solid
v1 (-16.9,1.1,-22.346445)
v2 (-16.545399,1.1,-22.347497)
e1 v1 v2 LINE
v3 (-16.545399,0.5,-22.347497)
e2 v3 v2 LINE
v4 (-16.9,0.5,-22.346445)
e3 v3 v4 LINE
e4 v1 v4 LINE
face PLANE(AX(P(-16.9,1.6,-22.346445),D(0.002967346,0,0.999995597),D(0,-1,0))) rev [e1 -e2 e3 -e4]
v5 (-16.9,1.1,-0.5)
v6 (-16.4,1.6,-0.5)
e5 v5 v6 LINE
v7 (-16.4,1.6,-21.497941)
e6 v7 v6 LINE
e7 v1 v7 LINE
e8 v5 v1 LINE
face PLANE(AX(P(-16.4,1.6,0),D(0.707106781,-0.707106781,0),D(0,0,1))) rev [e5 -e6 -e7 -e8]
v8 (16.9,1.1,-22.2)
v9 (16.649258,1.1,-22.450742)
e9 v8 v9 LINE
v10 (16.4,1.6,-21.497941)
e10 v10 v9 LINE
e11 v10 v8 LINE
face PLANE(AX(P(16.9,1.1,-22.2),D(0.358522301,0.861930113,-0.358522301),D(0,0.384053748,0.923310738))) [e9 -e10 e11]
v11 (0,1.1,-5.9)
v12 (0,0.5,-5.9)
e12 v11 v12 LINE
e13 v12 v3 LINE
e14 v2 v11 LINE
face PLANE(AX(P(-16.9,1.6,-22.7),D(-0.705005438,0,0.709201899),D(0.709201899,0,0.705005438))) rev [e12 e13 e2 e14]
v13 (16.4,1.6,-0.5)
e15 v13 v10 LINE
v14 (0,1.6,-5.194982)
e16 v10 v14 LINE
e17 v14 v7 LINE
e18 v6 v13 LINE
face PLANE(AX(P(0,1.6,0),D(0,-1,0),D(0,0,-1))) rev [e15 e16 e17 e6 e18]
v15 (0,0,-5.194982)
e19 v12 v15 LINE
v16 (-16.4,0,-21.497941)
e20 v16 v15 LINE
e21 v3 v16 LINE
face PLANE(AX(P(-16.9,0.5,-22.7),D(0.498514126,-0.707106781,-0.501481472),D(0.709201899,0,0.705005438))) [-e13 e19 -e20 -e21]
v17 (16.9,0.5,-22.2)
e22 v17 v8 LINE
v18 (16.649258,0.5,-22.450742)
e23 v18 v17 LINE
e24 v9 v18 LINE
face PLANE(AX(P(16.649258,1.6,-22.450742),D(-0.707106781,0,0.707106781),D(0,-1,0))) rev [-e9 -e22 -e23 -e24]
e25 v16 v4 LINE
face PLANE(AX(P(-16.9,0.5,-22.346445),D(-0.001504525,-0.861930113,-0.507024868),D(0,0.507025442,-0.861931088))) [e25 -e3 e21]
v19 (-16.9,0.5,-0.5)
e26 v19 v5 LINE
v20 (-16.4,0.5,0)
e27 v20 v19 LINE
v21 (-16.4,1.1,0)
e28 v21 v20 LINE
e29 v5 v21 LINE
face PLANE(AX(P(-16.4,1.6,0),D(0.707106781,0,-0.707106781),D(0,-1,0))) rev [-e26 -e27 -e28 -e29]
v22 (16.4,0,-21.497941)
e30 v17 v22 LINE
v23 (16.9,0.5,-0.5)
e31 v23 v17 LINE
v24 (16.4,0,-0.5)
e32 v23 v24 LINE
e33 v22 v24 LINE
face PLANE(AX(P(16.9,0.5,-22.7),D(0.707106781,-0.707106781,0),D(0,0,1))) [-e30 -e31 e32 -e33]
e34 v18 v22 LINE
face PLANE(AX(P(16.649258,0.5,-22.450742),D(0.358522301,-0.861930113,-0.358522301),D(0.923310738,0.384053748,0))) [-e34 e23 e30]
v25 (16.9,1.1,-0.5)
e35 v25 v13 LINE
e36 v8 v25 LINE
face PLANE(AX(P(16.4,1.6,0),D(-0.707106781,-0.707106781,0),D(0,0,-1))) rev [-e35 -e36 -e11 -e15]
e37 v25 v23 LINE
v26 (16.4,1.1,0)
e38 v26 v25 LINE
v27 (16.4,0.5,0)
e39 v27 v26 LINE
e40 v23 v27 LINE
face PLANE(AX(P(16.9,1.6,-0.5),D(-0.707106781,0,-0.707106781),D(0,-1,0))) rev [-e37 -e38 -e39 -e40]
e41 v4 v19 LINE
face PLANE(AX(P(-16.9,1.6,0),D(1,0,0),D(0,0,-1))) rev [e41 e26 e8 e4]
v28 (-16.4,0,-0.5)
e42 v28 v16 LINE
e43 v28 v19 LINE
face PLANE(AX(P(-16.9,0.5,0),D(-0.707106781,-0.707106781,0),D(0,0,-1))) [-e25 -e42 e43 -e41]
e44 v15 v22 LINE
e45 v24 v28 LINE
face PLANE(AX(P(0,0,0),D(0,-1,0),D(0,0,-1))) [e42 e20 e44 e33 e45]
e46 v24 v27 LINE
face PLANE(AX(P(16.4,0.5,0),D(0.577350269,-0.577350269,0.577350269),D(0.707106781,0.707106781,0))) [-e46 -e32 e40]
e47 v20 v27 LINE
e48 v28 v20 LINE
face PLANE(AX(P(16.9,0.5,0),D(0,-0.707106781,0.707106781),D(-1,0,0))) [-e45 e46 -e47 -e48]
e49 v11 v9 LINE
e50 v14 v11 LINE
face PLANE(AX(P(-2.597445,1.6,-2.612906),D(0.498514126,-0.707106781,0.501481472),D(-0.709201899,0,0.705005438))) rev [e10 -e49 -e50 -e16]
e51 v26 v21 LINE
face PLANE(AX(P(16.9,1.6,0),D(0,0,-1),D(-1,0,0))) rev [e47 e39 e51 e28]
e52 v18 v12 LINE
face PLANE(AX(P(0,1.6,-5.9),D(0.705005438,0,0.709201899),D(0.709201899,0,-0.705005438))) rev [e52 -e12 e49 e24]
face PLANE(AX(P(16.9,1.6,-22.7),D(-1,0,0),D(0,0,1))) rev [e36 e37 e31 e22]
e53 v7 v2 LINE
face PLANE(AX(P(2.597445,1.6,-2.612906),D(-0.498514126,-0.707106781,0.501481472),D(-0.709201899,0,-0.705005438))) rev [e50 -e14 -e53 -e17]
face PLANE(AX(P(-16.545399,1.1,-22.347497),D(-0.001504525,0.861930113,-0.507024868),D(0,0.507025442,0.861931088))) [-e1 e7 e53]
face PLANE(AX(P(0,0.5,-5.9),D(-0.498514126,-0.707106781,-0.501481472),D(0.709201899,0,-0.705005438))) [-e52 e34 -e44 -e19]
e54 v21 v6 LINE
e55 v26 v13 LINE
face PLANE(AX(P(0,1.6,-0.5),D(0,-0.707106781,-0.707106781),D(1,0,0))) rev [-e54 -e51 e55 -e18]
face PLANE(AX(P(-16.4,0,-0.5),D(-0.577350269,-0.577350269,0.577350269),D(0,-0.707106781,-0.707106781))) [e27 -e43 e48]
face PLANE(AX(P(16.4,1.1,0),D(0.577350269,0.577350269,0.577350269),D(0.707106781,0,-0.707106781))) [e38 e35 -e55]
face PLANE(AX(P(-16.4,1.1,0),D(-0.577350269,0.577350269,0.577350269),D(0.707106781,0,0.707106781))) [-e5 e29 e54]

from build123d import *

# Parameters (mm, degrees)
BOSS_EXTRUDE1_DEPTH = 1.6


with BuildPart() as part:
    # Sketch1 → Boss-Extrude1 (new body)
    with BuildSketch(Plane(origin=(0, 0, 0), x_dir=(1, 0, 0), z_dir=(0, 1, 0))):
        Polygon((16.9, 22.7), (16.9, 0), (-16.9, 0), (-16.9, 22.7), (0, 5.9), align=None)
    extrude(amount=BOSS_EXTRUDE1_DEPTH)

    # Chamfer1
    # the kernel refuses this chamfer: 0.5, 0.353554947 mm, written as the material it takes off along each edge
    with BuildSketch(Plane(origin=(-16.566666667, 1.266666667, -0.333333333), x_dir=(-0.7071067811865475, 0, -0.7071067811865475), z_dir=(-0.5773502691896256, 0.5773502691896261, 0.5773502691896256)), Plane(origin=(16.566666667, 1.266666667, -0.333333333), x_dir=(-0.7071067811865475, 0, 0.7071067811865475), z_dir=(0.5773502691896258, 0.5773502691896256, 0.5773502691896258))) as chamfer1_piece_1:
        Polygon((-0.353553391, 0.204124145), (0.353553391, 0.204124145), (0, -0.40824829), align=None)
    extrude(amount=0.635085296, mode=Mode.SUBTRACT)
    with BuildSketch(Plane(origin=(-16.615133017, 1.266666667, -22.06396102), x_dir=(0.9999955974192072, 0, -0.0029673459864134454), z_dir=(-0.0015045248311199464, 0.8619301129134874, -0.507024868086345))) as chamfer1_piece_2:
        Polygon((-0.284027501, 0.328713527), (0.070575009, 0.328713527), (0.213452492, -0.657427055), align=None)
    extrude(amount=0.671248828, mode=Mode.SUBTRACT)
    with BuildSketch(Plane(origin=(16.64975272, 1.266666667, -22.049560855), x_dir=(-0.7071067811865375, 0, -0.7071067811865576), z_dir=(0.35852230087747156, 0.8619301129134861, -0.3585223008774614))) as chamfer1_piece_3:
        Polygon((-0.070575009, -0.328713527), (0.284027501, -0.328713527), (-0.213452492, 0.657427055), align=None)
    extrude(amount=0.671248828, mode=Mode.SUBTRACT)
    with BuildSketch(Plane(origin=(16.64975272, 0.333333333, -22.049560855), x_dir=(-0.7071067811865375, 0, -0.7071067811865576), z_dir=(0.3585223008774716, -0.8619301129134861, -0.3585223008774613))) as chamfer1_piece_4:
        Polygon((-0.070575009, 0.328713527), (0.284027501, 0.328713527), (-0.213452492, -0.657427055), align=None)
    extrude(amount=0.671248828, mode=Mode.SUBTRACT)
    with BuildSketch(Plane(origin=(16.566666667, 0.333333333, -0.333333333), x_dir=(-0.7071067811865475, 0, 0.7071067811865475), z_dir=(0.5773502691896258, -0.5773502691896257, 0.5773502691896258)), Plane(origin=(-16.566666667, 0.333333333, -0.333333333), x_dir=(-0.7071067811865475, 0, -0.7071067811865475), z_dir=(-0.5773502691896256, -0.5773502691896261, 0.5773502691896255))) as chamfer1_piece_5:
        Polygon((-0.353553391, -0.204124145), (0.353553391, -0.204124145), (0, 0.40824829), align=None)
    extrude(amount=0.635085296, mode=Mode.SUBTRACT)
    with BuildSketch(Plane(origin=(-16.615133017, 0.333333333, -22.06396102), x_dir=(0.9999955974192072, 0, -0.0029673459864134454), z_dir=(-0.0015045248311200809, -0.8619301129134874, -0.507024868086345))) as chamfer1_piece_6:
        Polygon((-0.284027501, -0.328713527), (0.070575009, -0.328713527), (0.213452492, 0.657427055), align=None)
    extrude(amount=0.671248828, mode=Mode.SUBTRACT)
    with BuildSketch(Plane(origin=(-16.9, 1.6, 1.285841494), x_dir=(-0.02749587661058907, -0.9996219169112965, 0), z_dir=(0, 0, -1)), Plane(origin=(16.9, 1.6, -23.985841494), x_dir=(0.02749587661058907, -0.9996219169112965, 0), z_dir=(0, 0, 1))) as chamfer1_piece_7:
        with BuildLine():
            Line((0.514336598, 0), (-0.028273577, -0.513558897))
            Line((-0.028273577, -0.513558897), (-0.038269797, -0.513283938))
            ThreePointArc((-0.038269797, -0.513283938), (-0.017064614, -0.256698915), (-0.009996219, 0.000274959))
            Line((-0.009996219, 0.000274959), (0.000274959, 0.009996219))
            ThreePointArc((0.000274959, 0.009996219), (0.257248832, 0.002927825), (0.514611556, 0.009996219))
            Line((0.514611556, 0.009996219), (0.514336598, 0))
        make_face()
    extrude(amount=25.271682988, mode=Mode.SUBTRACT)
    with BuildSketch(Plane(origin=(18.185841494, 1.6, 0), x_dir=(0, -0.9996219169112968, 0.02749587661058636), z_dir=(-1, 0, 0))) as chamfer1_piece_8:
        with BuildLine():
            Line((0.514336598, 0), (-0.028273577, -0.513558897))
            Line((-0.028273577, -0.513558897), (-0.038269797, -0.513283938))
            ThreePointArc((-0.038269797, -0.513283938), (-0.017064614, -0.256698915), (-0.009996219, 0.000274959))
            Line((-0.009996219, 0.000274959), (0.000274959, 0.009996219))
            ThreePointArc((0.000274959, 0.009996219), (0.257248832, 0.002927825), (0.514611556, 0.009996219))
            Line((0.514611556, 0.009996219), (0.514336598, 0))
        make_face()
    extrude(amount=36.371682988, mode=Mode.SUBTRACT)
    with BuildSketch(Plane(origin=(-0.911921229, 1.6, -4.993474755), x_dir=(-0.019384742522666594, -0.9996219169112968, -0.01950012789482532), z_dir=(0.7092018985609293, 0, -0.7050054376226992))) as chamfer1_piece_9_section:
        with BuildLine():
            Line((0.514336598, 0), (-0.028273577, -0.513558897))
            Line((-0.028273577, -0.513558897), (-0.038269797, -0.513283938))
            ThreePointArc((-0.038269797, -0.513283938), (-0.017064614, -0.256698915), (-0.009996219, 0.000274959))
            Line((-0.009996219, 0.000274959), (0.000274959, 0.009996219))
            ThreePointArc((0.000274959, 0.009996219), (0.257248832, 0.002927825), (0.514611556, 0.009996219))
            Line((0.514611556, 0.009996219), (0.514336598, 0))
        make_face()
    chamfer1_piece_9 = extrude(amount=26.401286426, mode=Mode.PRIVATE)
    chamfer1_piece_9 = split(chamfer1_piece_9, bisect_by=Plane(origin=(0.169796373, 1.435101181, -5.731208339), z_dir=(0.705005437622699, 0, -0.7092018985609295)), keep=Keep.TOP, mode=Mode.PRIVATE)
    add(chamfer1_piece_9, mode=Mode.SUBTRACT)
    with BuildSketch(Plane(origin=(16.9, 0, -23.985841494), x_dir=(0.02749587661058908, 0.9996219169112968, 0), z_dir=(0, 0, 1)), Plane(origin=(-16.9, 0, 1.285841494), x_dir=(-0.02749587661058908, 0.9996219169112968, 0), z_dir=(0, 0, -1))) as chamfer1_piece_10:
        with BuildLine():
            Line((0.514336598, 0), (-0.028273577, 0.513558897))
            Line((-0.028273577, 0.513558897), (-0.038269797, 0.513283938))
            ThreePointArc((-0.038269797, 0.513283938), (-0.017064614, 0.256698915), (-0.009996219, -0.000274959))
            Line((-0.009996219, -0.000274959), (0.000274959, -0.009996219))
            ThreePointArc((0.000274959, -0.009996219), (0.257248832, -0.002927825), (0.514611556, -0.009996219))
            Line((0.514611556, -0.009996219), (0.514336598, 0))
        make_face()
    extrude(amount=25.271682988, mode=Mode.SUBTRACT)
    with BuildSketch(Plane(origin=(18.185841494, 0, 0), x_dir=(0, 0.9996219169112968, 0.02749587661058637), z_dir=(-1, 0, 0))) as chamfer1_piece_11:
        with BuildLine():
            Line((0.514336598, 0), (-0.028273577, 0.513558897))
            Line((-0.028273577, 0.513558897), (-0.038269797, 0.513283938))
            ThreePointArc((-0.038269797, 0.513283938), (-0.017064614, 0.256698915), (-0.009996219, -0.000274959))
            Line((-0.009996219, -0.000274959), (0.000274959, -0.009996219))
            ThreePointArc((0.000274959, -0.009996219), (0.257248832, -0.002927825), (0.514611556, -0.009996219))
            Line((0.514611556, -0.009996219), (0.514336598, 0))
        make_face()
    extrude(amount=36.371682988, mode=Mode.SUBTRACT)
    with BuildSketch(Plane(origin=(-17.811921229, 0, -23.606525245), x_dir=(0.019384742522664138, 0.9996219169112968, -0.019500127894822857), z_dir=(0.7092018985609295, 0, 0.705005437622699))) as chamfer1_piece_12_section:
        with BuildLine():
            Line((0.514336598, 0), (-0.028273577, 0.513558897))
            Line((-0.028273577, 0.513558897), (-0.038269797, 0.513283938))
            ThreePointArc((-0.038269797, 0.513283938), (-0.017064614, 0.256698915), (-0.009996219, -0.000274959))
            Line((-0.009996219, -0.000274959), (0.000274959, -0.009996219))
            ThreePointArc((0.000274959, -0.009996219), (0.257248832, -0.002927825), (0.514611556, -0.009996219))
            Line((0.514611556, -0.009996219), (0.514336598, 0))
        make_face()
    chamfer1_piece_12 = extrude(amount=26.401286426, mode=Mode.PRIVATE)
    chamfer1_piece_12 = split(chamfer1_piece_12, bisect_by=Plane(origin=(-0.169796373, 0.164898819, -5.731208339), z_dir=(-0.7050054376226992, 0, -0.7092018985609293)), keep=Keep.TOP, mode=Mode.PRIVATE)
    add(chamfer1_piece_12, mode=Mode.SUBTRACT)
    with BuildSketch(Plane(origin=(-0.911921229, 0, -4.993474755), x_dir=(-0.0193847425226666, 0.9996219169112968, -0.019500127894825324), z_dir=(0.7092018985609293, 0, -0.7050054376226992))) as chamfer1_piece_13_section:
        with BuildLine():
            Line((0.514336598, 0), (-0.028273577, 0.513558897))
            Line((-0.028273577, 0.513558897), (-0.038269797, 0.513283938))
            ThreePointArc((-0.038269797, 0.513283938), (-0.017064614, 0.256698915), (-0.009996219, -0.000274959))
            Line((-0.009996219, -0.000274959), (0.000274959, -0.009996219))
            ThreePointArc((0.000274959, -0.009996219), (0.257248832, -0.002927825), (0.514611556, -0.009996219))
            Line((0.514611556, -0.009996219), (0.514336598, 0))
        make_face()
    chamfer1_piece_13 = extrude(amount=26.401286426, mode=Mode.PRIVATE)
    chamfer1_piece_13 = split(chamfer1_piece_13, bisect_by=Plane(origin=(0.169796373, 0.164898819, -5.731208339), z_dir=(0.705005437622699, 0, -0.7092018985609295)), keep=Keep.TOP, mode=Mode.PRIVATE)
    add(chamfer1_piece_13, mode=Mode.SUBTRACT)
    with BuildSketch(Plane(origin=(-17.811921229, 1.6, -23.606525245), x_dir=(0.019384742522664134, -0.9996219169112968, -0.019500127894822854), z_dir=(0.7092018985609295, 0, 0.705005437622699))) as chamfer1_piece_14_section:
        with BuildLine():
            Line((0.514336598, 0), (-0.028273577, -0.513558897))
            Line((-0.028273577, -0.513558897), (-0.038269797, -0.513283938))
            ThreePointArc((-0.038269797, -0.513283938), (-0.017064614, -0.256698915), (-0.009996219, 0.000274959))
            Line((-0.009996219, 0.000274959), (0.000274959, 0.009996219))
            ThreePointArc((0.000274959, 0.009996219), (0.257248832, 0.002927825), (0.514611556, 0.009996219))
            Line((0.514611556, 0.009996219), (0.514336598, 0))
        make_face()
    chamfer1_piece_14 = extrude(amount=26.401286426, mode=Mode.PRIVATE)
    chamfer1_piece_14 = split(chamfer1_piece_14, bisect_by=Plane(origin=(-0.169796373, 1.435101181, -5.731208339), z_dir=(-0.7050054376226992, 0, -0.7092018985609293)), keep=Keep.TOP, mode=Mode.PRIVATE)
    add(chamfer1_piece_14, mode=Mode.SUBTRACT)
    with BuildSketch(Plane(origin=(16.9, -1.285841494, 0), x_dir=(0.02749587661058908, 0, -0.9996219169112968), z_dir=(0, 1, 0)), Plane(origin=(-16.9, -1.285841494, 0), x_dir=(0.9996219169112968, 0, 0.027495876610586178), z_dir=(0, 1, 0))) as chamfer1_piece_15:
        with BuildLine():
            Line((0.514336598, 0), (-0.028273577, 0.513558897))
            Line((-0.028273577, 0.513558897), (-0.038269797, 0.513283938))
            ThreePointArc((-0.038269797, 0.513283938), (-0.017064614, 0.256698915), (-0.009996219, -0.000274959))
            Line((-0.009996219, -0.000274959), (0.000274959, -0.009996219))
            ThreePointArc((0.000274959, -0.009996219), (0.257248832, -0.002927825), (0.514611556, -0.009996219))
            Line((0.514611556, -0.009996219), (0.514336598, 0))
        make_face()
    extrude(amount=4.171682988, mode=Mode.SUBTRACT)
    with BuildSketch(Plane(origin=(16.9, -1.285841494, -22.7), x_dir=(0.027495876610589005, 0, 0.9996219169112968), z_dir=(0, 1, 0))) as chamfer1_piece_16:
        with BuildLine():
            Line((0.514336598, 0), (0.227743914, -0.271248548))
            Line((0.227743914, -0.271248548), (0.220460729, -0.278100936))
            ThreePointArc((0.220460729, -0.278100936), (0.113871925, -0.135624304), (-0.007283185, -0.006852388))
            Line((-0.007283185, -0.006852388), (0.000274959, 0.009996219))
            ThreePointArc((0.000274959, 0.009996219), (0.257248832, 0.002927825), (0.514611556, 0.009996219))
            Line((0.514611556, 0.009996219), (0.514336598, 0))
        make_face()
    extrude(amount=4.171682988, mode=Mode.SUBTRACT)
    with BuildSketch(Plane(origin=(-16.9, -1.285841494, -22.7), x_dir=(-0.05646830535179678, 0, 0.9984043922633233), z_dir=(0, 1, 0))) as chamfer1_piece_17:
        with BuildLine():
            Line((0.354179425, 0), (0.330727935, 0.393905025))
            Line((0.330727935, 0.393905025), (0.323249127, 0.400543356))
            ThreePointArc((0.323249127, 0.400543356), (0.163173475, 0.198896835), (-0.007478808, 0.006638331))
            Line((-0.007478808, 0.006638331), (0.000564683, -0.009984044))
            ThreePointArc((0.000564683, -0.009984044), (0.177089715, -4.4e-08), (0.354744109, -0.009984044))
            Line((0.354744109, -0.009984044), (0.354179425, 0))
        make_face()
    extrude(amount=4.171682988, mode=Mode.SUBTRACT)
    with BuildSketch(Plane(origin=(-17.811921229, 1.6, -23.606525245), x_dir=(0.019384742522664134, -0.9996219169112968, -0.019500127894822854), z_dir=(0.7092018985609295, 0, 0.705005437622699))) as chamfer1_piece_18a_section:
        with BuildLine():
            Line((0.514336598, 0), (-0.028273577, -0.513558897))
            Line((-0.028273577, -0.513558897), (-0.038269797, -0.513283938))
            ThreePointArc((-0.038269797, -0.513283938), (-0.017064614, -0.256698915), (-0.009996219, 0.000274959))
            Line((-0.009996219, 0.000274959), (0.000274959, 0.009996219))
            ThreePointArc((0.000274959, 0.009996219), (0.257248832, 0.002927825), (0.514611556, 0.009996219))
            Line((0.514611556, 0.009996219), (0.514336598, 0))
        make_face()
    chamfer1_piece_18a = extrude(amount=26.401286426, mode=Mode.PRIVATE)
    chamfer1_piece_18a = split(chamfer1_piece_18a, bisect_by=Plane(origin=(-0.114291086, 1.435142329, -5.786385193), z_dir=(0.7050054376226992, 0, 0.7092018985609293)), keep=Keep.TOP, mode=Mode.PRIVATE)
    with BuildSketch(Plane(origin=(-0.911921229, 1.6, -4.993474755), x_dir=(-0.019384742522666594, -0.9996219169112968, -0.01950012789482532), z_dir=(0.7092018985609293, 0, -0.7050054376226992))) as chamfer1_piece_18b_section:
        with BuildLine():
            Line((0.514336598, 0), (-0.028273577, -0.513558897))
            Line((-0.028273577, -0.513558897), (-0.038269797, -0.513283938))
            ThreePointArc((-0.038269797, -0.513283938), (-0.017064614, -0.256698915), (-0.009996219, 0.000274959))
            Line((-0.009996219, 0.000274959), (0.000274959, 0.009996219))
            ThreePointArc((0.000274959, 0.009996219), (0.257248832, 0.002927825), (0.514611556, 0.009996219))
            Line((0.514611556, 0.009996219), (0.514336598, 0))
        make_face()
    chamfer1_piece_18b = extrude(amount=26.401286426, mode=Mode.PRIVATE)
    chamfer1_piece_18b = split(chamfer1_piece_18b, bisect_by=Plane(origin=(0.114291086, 1.435142329, -5.786385193), z_dir=(-0.705005437622699, 0, 0.7092018985609295)), keep=Keep.TOP, mode=Mode.PRIVATE)
    chamfer1_piece_18 = chamfer1_piece_18a & chamfer1_piece_18b
    add(chamfer1_piece_18, mode=Mode.SUBTRACT)
    with BuildSketch(Plane(origin=(-17.811921229, 0, -23.606525245), x_dir=(0.019384742522664138, 0.9996219169112968, -0.019500127894822857), z_dir=(0.7092018985609295, 0, 0.705005437622699))) as chamfer1_piece_19a_section:
        with BuildLine():
            Line((0.514336598, 0), (-0.028273577, 0.513558897))
            Line((-0.028273577, 0.513558897), (-0.038269797, 0.513283938))
            ThreePointArc((-0.038269797, 0.513283938), (-0.017064614, 0.256698915), (-0.009996219, -0.000274959))
            Line((-0.009996219, -0.000274959), (0.000274959, -0.009996219))
            ThreePointArc((0.000274959, -0.009996219), (0.257248832, -0.002927825), (0.514611556, -0.009996219))
            Line((0.514611556, -0.009996219), (0.514336598, 0))
        make_face()
    chamfer1_piece_19a = extrude(amount=26.401286426, mode=Mode.PRIVATE)
    chamfer1_piece_19a = split(chamfer1_piece_19a, bisect_by=Plane(origin=(-0.114291086, 0.164857671, -5.786385193), z_dir=(0.7050054376226992, 0, 0.7092018985609293)), keep=Keep.TOP, mode=Mode.PRIVATE)
    with BuildSketch(Plane(origin=(-0.911921229, 0, -4.993474755), x_dir=(-0.0193847425226666, 0.9996219169112968, -0.019500127894825324), z_dir=(0.7092018985609293, 0, -0.7050054376226992))) as chamfer1_piece_19b_section:
        with BuildLine():
            Line((0.514336598, 0), (-0.028273577, 0.513558897))
            Line((-0.028273577, 0.513558897), (-0.038269797, 0.513283938))
            ThreePointArc((-0.038269797, 0.513283938), (-0.017064614, 0.256698915), (-0.009996219, -0.000274959))
            Line((-0.009996219, -0.000274959), (0.000274959, -0.009996219))
            ThreePointArc((0.000274959, -0.009996219), (0.257248832, -0.002927825), (0.514611556, -0.009996219))
            Line((0.514611556, -0.009996219), (0.514336598, 0))
        make_face()
    chamfer1_piece_19b = extrude(amount=26.401286426, mode=Mode.PRIVATE)
    chamfer1_piece_19b = split(chamfer1_piece_19b, bisect_by=Plane(origin=(0.114291086, 0.164857671, -5.786385193), z_dir=(-0.705005437622699, 0, 0.7092018985609295)), keep=Keep.TOP, mode=Mode.PRIVATE)
    chamfer1_piece_19 = chamfer1_piece_19a & chamfer1_piece_19b
    add(chamfer1_piece_19, mode=Mode.SUBTRACT)


solid = part.part
